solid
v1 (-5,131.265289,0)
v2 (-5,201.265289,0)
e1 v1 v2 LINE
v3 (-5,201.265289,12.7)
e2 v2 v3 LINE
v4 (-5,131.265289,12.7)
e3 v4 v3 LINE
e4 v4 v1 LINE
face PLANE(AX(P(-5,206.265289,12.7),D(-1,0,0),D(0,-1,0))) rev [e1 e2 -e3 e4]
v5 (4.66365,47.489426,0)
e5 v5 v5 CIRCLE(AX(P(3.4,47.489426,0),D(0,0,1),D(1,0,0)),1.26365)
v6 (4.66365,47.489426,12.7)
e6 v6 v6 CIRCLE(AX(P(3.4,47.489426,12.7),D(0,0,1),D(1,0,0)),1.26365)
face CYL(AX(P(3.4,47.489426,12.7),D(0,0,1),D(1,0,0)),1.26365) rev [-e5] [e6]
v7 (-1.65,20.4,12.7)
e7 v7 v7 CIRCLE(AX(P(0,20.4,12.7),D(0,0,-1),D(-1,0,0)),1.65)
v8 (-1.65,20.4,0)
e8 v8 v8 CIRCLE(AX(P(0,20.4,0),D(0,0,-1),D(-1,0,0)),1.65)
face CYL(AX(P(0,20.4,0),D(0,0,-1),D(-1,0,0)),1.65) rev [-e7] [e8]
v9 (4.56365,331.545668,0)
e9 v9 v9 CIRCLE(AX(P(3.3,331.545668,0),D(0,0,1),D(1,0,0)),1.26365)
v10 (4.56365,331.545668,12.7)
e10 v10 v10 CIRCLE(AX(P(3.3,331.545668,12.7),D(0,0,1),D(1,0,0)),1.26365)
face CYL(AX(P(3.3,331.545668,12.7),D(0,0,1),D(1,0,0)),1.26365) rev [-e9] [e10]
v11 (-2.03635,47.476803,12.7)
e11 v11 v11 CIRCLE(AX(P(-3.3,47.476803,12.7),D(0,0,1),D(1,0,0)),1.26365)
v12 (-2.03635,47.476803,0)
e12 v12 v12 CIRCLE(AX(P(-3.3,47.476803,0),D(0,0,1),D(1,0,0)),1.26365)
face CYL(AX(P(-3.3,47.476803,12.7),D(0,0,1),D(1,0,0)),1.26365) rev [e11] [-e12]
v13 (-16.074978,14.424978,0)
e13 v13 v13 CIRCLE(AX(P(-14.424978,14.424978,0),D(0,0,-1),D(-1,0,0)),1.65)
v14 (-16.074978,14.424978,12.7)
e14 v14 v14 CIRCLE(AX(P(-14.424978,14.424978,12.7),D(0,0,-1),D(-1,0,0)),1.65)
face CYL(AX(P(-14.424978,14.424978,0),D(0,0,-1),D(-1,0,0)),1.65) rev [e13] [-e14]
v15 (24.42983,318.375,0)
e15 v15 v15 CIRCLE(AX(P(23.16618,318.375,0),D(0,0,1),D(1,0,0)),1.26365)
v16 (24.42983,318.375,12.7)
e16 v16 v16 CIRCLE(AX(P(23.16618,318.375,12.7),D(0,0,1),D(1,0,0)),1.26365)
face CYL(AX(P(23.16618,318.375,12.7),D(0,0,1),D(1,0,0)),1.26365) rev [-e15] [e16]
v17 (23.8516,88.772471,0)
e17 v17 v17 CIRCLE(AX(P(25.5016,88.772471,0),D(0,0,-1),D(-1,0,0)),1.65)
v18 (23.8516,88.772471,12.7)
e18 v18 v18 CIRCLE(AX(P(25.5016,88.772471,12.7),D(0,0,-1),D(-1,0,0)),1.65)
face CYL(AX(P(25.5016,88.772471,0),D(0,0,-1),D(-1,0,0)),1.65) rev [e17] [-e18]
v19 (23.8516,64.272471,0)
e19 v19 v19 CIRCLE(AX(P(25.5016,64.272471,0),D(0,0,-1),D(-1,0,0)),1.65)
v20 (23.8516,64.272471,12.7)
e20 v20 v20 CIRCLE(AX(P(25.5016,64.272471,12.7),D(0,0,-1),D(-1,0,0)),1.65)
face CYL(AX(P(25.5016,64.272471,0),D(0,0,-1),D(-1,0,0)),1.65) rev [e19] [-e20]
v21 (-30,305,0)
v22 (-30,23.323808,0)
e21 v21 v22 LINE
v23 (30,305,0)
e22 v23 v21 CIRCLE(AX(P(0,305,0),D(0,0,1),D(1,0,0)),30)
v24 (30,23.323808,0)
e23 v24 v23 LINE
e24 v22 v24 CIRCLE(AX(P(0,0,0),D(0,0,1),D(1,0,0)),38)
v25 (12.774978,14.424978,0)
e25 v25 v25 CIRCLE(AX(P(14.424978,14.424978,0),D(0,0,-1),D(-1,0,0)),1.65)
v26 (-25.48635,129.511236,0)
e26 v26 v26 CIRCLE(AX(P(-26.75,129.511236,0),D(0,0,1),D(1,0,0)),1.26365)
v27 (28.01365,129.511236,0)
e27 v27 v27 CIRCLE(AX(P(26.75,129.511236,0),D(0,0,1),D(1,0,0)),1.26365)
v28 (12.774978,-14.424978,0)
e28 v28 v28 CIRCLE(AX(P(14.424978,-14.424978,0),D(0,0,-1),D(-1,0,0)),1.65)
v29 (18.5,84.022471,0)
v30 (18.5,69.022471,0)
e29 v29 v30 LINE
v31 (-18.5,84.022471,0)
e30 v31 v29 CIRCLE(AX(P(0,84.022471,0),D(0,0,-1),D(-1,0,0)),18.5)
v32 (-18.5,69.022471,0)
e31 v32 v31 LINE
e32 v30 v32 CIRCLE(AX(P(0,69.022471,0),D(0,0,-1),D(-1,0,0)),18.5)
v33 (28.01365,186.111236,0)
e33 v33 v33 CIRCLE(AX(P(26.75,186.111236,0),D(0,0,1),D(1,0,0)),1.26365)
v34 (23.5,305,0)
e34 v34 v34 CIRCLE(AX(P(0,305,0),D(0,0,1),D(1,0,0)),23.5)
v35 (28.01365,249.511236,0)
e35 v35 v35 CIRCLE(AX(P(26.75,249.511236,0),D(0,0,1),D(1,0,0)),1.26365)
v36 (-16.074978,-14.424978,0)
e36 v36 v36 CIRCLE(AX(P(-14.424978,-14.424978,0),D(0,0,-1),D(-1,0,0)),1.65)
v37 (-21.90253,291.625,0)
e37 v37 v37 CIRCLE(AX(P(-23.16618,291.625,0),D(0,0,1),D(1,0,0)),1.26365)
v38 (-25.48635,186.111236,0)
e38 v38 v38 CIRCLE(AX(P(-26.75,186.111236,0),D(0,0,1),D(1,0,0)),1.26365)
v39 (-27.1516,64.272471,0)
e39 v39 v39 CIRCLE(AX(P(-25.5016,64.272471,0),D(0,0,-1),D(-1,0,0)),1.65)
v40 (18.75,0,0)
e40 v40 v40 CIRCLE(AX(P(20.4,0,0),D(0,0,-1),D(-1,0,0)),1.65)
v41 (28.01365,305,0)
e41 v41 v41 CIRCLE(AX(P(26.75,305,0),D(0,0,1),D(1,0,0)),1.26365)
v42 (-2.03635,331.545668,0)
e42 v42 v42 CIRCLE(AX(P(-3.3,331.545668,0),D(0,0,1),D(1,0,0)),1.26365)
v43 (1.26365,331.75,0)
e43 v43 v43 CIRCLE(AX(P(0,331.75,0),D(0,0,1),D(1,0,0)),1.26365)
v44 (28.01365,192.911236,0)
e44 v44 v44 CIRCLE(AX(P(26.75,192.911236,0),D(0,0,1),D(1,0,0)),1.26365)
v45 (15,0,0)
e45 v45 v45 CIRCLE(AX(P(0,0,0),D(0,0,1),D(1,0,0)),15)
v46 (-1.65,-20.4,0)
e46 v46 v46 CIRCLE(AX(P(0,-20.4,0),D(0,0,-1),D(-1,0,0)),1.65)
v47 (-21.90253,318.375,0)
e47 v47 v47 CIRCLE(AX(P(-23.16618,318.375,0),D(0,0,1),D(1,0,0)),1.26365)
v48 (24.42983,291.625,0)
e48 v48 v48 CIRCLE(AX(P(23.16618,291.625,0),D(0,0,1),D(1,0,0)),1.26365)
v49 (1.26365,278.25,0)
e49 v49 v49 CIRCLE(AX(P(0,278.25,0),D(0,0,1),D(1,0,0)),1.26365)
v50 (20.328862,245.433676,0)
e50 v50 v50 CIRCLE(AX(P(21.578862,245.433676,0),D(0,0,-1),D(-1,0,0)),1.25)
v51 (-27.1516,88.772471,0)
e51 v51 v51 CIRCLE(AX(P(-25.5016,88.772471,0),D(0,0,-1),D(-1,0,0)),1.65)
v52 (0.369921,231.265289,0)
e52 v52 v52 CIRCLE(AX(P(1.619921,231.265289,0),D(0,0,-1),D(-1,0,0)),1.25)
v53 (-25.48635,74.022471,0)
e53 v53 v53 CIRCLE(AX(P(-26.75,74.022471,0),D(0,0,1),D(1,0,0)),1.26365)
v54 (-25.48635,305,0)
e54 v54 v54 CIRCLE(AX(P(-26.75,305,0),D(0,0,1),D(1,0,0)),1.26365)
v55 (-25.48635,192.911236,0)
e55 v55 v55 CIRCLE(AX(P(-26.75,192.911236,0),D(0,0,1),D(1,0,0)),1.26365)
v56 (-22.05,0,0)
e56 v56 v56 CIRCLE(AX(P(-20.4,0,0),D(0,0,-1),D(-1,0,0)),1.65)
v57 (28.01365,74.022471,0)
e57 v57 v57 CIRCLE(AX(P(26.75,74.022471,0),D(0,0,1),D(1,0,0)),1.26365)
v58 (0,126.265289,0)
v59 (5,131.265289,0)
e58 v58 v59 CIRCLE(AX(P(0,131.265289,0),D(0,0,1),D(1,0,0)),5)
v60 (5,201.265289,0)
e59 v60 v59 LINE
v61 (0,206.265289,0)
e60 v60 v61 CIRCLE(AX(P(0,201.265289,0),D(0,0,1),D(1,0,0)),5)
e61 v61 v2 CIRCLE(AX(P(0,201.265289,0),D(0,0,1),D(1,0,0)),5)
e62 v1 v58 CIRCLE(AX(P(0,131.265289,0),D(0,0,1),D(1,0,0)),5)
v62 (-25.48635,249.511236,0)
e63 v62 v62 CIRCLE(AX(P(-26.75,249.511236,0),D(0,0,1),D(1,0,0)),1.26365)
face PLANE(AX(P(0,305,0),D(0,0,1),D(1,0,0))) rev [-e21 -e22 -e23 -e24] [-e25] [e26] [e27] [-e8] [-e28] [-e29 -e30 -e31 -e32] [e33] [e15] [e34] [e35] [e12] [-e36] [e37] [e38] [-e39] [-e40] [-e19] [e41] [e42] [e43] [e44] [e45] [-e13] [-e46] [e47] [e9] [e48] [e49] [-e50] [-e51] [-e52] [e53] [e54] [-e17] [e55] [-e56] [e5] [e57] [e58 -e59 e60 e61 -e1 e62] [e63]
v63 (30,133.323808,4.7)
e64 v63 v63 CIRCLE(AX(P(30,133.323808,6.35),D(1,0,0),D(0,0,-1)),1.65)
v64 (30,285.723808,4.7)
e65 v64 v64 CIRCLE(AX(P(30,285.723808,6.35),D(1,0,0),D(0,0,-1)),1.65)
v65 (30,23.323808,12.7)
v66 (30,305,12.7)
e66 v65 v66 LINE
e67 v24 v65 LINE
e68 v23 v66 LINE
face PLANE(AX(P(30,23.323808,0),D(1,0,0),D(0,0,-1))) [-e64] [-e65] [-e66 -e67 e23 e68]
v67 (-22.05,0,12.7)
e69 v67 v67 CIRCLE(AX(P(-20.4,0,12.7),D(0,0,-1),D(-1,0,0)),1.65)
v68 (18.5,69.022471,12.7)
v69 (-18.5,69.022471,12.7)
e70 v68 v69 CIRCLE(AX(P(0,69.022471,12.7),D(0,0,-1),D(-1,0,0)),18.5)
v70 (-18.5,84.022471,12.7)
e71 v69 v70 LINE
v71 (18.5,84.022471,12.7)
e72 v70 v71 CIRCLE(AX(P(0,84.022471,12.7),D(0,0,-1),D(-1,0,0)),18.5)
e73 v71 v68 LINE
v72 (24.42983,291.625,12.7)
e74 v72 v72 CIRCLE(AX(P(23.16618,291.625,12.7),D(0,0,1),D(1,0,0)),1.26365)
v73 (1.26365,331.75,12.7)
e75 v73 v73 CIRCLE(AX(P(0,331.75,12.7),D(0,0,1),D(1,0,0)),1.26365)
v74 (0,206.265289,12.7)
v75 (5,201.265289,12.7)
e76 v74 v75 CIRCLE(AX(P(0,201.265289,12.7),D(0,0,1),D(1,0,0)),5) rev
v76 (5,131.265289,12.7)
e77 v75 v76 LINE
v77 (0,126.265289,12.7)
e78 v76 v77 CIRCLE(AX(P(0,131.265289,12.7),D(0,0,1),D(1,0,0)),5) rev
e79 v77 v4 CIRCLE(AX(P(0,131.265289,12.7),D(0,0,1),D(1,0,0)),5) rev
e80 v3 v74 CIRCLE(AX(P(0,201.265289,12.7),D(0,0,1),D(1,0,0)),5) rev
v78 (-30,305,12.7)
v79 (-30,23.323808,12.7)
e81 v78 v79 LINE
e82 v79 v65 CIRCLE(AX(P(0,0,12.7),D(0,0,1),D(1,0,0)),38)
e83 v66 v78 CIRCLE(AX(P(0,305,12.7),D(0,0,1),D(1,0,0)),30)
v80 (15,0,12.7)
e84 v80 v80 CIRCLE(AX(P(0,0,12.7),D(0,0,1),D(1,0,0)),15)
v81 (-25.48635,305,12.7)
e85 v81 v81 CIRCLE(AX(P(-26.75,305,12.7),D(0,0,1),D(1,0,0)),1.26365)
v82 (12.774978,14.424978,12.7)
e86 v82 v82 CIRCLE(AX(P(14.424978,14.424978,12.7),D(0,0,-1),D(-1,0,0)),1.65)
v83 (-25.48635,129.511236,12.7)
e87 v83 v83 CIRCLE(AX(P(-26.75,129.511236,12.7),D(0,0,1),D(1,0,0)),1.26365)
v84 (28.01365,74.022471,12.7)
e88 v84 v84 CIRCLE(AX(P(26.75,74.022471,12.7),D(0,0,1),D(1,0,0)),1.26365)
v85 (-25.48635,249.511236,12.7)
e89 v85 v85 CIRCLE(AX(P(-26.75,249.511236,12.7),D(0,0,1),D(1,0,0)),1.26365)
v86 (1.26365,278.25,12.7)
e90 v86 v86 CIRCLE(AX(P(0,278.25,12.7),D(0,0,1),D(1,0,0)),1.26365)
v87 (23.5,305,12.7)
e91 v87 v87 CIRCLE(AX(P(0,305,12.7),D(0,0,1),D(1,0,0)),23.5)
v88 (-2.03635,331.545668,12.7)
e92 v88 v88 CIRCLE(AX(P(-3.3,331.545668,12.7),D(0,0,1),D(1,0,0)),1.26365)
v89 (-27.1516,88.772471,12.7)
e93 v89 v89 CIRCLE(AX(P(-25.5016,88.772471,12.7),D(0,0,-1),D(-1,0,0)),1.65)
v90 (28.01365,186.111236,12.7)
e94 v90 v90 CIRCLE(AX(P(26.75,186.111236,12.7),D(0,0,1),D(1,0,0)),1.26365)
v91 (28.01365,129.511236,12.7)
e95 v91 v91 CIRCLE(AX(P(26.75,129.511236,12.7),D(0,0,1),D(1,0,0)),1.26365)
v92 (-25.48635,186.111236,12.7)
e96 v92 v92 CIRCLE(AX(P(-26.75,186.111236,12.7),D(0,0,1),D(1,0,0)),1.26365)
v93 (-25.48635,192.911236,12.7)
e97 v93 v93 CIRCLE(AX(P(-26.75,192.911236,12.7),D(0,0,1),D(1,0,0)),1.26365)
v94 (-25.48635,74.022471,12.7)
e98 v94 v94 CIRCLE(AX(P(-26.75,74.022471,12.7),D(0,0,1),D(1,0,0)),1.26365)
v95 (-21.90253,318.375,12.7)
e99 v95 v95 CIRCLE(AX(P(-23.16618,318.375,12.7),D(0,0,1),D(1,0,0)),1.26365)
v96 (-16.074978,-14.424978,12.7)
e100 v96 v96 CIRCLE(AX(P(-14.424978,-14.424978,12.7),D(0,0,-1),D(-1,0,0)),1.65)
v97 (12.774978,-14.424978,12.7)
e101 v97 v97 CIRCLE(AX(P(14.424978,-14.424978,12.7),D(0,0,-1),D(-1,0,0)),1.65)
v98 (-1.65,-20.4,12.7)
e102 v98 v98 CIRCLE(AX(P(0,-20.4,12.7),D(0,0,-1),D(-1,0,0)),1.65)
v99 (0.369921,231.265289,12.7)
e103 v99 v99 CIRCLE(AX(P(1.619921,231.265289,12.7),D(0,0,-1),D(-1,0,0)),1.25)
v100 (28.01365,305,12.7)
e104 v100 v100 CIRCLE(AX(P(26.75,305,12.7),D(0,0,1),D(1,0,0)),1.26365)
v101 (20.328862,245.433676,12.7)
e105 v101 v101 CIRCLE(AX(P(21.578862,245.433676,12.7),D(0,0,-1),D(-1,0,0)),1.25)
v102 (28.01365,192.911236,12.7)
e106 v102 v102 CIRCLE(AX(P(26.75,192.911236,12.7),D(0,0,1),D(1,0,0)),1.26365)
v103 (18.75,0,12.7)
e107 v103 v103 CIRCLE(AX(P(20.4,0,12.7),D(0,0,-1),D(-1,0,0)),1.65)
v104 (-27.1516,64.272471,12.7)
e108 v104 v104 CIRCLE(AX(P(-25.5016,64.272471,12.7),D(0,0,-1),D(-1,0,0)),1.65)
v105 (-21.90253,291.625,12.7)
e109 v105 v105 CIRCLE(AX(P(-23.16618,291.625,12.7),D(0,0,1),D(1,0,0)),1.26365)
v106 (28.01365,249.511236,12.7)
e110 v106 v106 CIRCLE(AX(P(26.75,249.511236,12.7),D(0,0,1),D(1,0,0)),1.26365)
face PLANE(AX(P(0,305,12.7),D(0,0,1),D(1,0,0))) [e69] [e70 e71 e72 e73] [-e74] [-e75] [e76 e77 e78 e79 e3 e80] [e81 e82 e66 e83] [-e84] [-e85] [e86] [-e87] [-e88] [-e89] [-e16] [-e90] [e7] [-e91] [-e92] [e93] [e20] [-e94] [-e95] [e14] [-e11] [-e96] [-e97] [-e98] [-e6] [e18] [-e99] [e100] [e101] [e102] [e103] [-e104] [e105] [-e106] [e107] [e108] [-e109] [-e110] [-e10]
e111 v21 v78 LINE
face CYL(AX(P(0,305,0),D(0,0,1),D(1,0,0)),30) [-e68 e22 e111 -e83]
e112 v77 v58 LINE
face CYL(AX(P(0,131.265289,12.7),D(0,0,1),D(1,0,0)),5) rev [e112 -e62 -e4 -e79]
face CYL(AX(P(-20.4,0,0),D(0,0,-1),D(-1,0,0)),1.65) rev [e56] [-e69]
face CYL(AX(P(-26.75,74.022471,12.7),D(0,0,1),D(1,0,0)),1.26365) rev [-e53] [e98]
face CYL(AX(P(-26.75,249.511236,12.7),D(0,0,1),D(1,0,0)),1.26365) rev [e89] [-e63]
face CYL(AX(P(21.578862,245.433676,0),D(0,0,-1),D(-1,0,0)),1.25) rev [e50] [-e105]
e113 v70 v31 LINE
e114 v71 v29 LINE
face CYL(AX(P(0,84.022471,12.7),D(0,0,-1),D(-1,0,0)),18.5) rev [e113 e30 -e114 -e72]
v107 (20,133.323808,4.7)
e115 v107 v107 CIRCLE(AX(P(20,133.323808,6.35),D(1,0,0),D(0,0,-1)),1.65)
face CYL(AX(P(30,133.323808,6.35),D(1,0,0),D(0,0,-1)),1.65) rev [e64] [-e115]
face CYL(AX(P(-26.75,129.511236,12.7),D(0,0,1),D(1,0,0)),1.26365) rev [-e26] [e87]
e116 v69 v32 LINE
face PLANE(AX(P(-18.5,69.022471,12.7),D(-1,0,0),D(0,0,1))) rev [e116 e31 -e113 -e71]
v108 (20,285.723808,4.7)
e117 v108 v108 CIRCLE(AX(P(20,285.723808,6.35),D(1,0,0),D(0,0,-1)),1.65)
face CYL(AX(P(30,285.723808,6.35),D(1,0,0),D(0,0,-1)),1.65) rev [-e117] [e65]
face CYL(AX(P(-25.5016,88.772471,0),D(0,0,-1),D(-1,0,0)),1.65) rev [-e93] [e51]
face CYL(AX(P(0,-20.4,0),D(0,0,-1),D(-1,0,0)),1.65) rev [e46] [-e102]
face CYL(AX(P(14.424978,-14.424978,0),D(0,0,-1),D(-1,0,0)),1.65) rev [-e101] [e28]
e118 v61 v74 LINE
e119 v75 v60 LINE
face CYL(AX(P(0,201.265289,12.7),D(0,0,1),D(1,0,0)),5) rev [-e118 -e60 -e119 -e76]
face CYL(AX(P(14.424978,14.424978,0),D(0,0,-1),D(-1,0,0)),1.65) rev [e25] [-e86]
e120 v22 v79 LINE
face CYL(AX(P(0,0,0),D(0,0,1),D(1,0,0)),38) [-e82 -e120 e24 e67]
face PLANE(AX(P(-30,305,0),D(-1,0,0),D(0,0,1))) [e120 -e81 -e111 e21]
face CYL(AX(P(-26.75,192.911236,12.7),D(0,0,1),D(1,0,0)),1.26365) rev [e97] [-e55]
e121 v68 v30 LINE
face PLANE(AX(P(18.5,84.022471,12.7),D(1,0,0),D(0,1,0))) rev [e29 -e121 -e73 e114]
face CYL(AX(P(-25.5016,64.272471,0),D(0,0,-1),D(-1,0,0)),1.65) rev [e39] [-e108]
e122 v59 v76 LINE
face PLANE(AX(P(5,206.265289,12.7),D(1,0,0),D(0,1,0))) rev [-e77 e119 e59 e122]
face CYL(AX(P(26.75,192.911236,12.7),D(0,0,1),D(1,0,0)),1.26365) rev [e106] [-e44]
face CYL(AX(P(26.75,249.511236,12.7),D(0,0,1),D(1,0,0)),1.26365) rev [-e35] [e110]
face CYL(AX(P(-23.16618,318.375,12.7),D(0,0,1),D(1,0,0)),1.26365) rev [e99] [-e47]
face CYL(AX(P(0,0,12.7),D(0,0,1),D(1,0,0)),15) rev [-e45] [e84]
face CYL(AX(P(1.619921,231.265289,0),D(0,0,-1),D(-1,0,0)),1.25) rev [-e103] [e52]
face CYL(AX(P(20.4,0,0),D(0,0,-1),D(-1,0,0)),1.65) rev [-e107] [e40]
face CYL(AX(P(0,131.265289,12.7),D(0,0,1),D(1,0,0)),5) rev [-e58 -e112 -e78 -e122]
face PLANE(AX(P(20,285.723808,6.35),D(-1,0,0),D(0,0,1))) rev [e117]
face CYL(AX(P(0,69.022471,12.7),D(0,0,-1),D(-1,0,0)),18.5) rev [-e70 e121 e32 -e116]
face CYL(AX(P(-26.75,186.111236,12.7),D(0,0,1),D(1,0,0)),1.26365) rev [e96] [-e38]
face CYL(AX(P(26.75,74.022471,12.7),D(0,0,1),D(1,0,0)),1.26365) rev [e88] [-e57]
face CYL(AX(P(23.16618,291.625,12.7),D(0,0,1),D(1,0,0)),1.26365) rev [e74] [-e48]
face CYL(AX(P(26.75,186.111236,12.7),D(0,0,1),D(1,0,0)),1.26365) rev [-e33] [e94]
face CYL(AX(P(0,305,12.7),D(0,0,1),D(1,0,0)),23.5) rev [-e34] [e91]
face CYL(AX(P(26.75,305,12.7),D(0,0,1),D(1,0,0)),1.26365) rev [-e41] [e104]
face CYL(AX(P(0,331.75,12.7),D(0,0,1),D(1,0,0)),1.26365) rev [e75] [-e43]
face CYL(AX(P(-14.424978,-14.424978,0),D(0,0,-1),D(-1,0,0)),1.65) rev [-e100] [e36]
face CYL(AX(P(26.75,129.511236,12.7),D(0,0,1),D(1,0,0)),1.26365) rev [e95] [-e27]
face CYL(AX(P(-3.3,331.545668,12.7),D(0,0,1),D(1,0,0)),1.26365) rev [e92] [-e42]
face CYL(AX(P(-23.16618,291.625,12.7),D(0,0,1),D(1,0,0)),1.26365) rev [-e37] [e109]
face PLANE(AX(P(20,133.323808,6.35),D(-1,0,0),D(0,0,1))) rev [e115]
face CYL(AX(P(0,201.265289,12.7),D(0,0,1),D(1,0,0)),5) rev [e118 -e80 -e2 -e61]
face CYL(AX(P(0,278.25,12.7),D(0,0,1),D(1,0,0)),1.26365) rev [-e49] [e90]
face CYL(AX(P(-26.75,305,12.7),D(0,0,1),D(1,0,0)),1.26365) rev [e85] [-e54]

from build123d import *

# Parameters (mm, degrees)
BOSS_EXTRUDE1_DEPTH          = 12.7
CUT_EXTRUDE1_DEPTH           = 338.387447899
HOLE1_D                      = 30
HOLE2_D                      = 47
F_39_0_0995_DIAMETER_HOLE1_D = 2.5273
F_4_CLEARANCE_HOLE1_D        = 3.3
F_2_CLEARANCE_HOLE1_D        = 2.499999999
F_4_CLEARANCE_HOLE2_D        = 3.3
F_4_CLEARANCE_HOLE2_DEPTH    = 10
SKETCH_1_W                   = 10
SKETCH_1_H                   = 80
CUT_EXTRUDE_1_DEPTH          = 338.387447899
FILLET_1_R                   = 5


with BuildPart() as part:
    # Sketch1 → Boss-Extrude1 (new body)
    with BuildSketch(Plane.XY.offset(12.7)):
        with BuildLine():
            Line((-30, 305), (-30, 23.323807579))
            ThreePointArc((-30, 23.323807579), (0, -38), (30, 23.323807579))
            Line((30, 23.323807579), (30, 305))
            ThreePointArc((30, 305), (0, 335), (-30, 305))
        make_face()
    extrude(amount=-BOSS_EXTRUDE1_DEPTH)

    # Sketch2 → Cut-Extrude1 (cut, through all)
    with BuildSketch(Plane(origin=(0, 0, 0), x_dir=(-1, 0, 0), z_dir=(0, 0, -1))):
        with BuildLine():
            Line((18.5, 69.02247107), (18.5, 84.02247107))
            ThreePointArc((18.5, 84.02247107), (0, 102.52247107), (-18.5, 84.02247107))
            Line((-18.5, 84.02247107), (-18.5, 69.02247107))
            ThreePointArc((-18.5, 69.02247107), (0, 50.52247107), (18.5, 69.02247107))
        make_face()
    extrude(amount=-CUT_EXTRUDE1_DEPTH, mode=Mode.SUBTRACT)

    # Hole1 (through all)
    with Locations(Plane.XY.offset(12.7)):
        with Locations((0, 0)):
            Hole(HOLE1_D / 2)

    # Hole2 (through all)
    with Locations(Plane.XY.offset(12.7)):
        with Locations((0, 305)):
            Hole(HOLE2_D / 2)

    # #39 (0.0995) Diameter Hole1 (through all)
    with Locations(Plane.XY.offset(12.7)):
        with Locations((-26.75, 74.022471071), (-26.75, 129.511235535), (-26.75, 186.111235535), (-26.750000001, 192.911235535), (-26.750000001, 249.511235535), (-26.750000001, 305), (-3.300000001, 331.545668196), (3.299999999, 331.545668196), (26.749999999, 305), (26.749999999, 249.511235535), (26.749999999, 192.911235535), (26.75, 186.111235535), (26.75, 129.511235535), (26.75, 74.022471071), (3.4, 47.489425637), (-3.3, 47.476802874), (-23.166179551, 318.375), (-23.166179551, 291.625), (0, 278.25), (23.166179551, 291.625), (23.166179551, 318.375), (0, 331.75)):
            Hole(F_39_0_0995_DIAMETER_HOLE1_D / 2)

    # #4 Clearance Hole1 (through all)
    with Locations(Plane(origin=(0, 0, 0), x_dir=(-1, 0, 0), z_dir=(0, 0, -1))):
        with Locations((-25.5016, 64.272471071), (-25.5016, 88.772471071), (14.424978336, 14.424978336), (20.4, 0), (14.424978336, -14.424978336), (0, -20.4), (-14.424978336, -14.424978336), (-20.4, 0), (-14.424978336, 14.424978336), (0, 20.4), (25.5016, 64.272471071), (25.5016, 88.772471071)):
            Hole(F_4_CLEARANCE_HOLE1_D / 2)

    # #2 Clearance Hole1 (through all)
    with Locations(Plane(origin=(0, 0, 0), x_dir=(-1, 0, 0), z_dir=(0, 0, -1))):
        with Locations((-1.619921459, 231.265288591), (-21.578861519, 245.43367635)):
            Hole(F_2_CLEARANCE_HOLE1_D / 2)

    # #4 Clearance Hole2
    with Locations(Plane(origin=(30, 0, 0), x_dir=(0, 0, -1), z_dir=(1, 0, 0))):
        with Locations((-6.35, 285.723807579), (-6.35, 133.323807579)):
            Hole(F_4_CLEARANCE_HOLE2_D / 2, depth=F_4_CLEARANCE_HOLE2_DEPTH)

    # 草图1 → 切除-拉伸1 (cut, through all)
    with BuildSketch(Plane(origin=(0, 0, 0), x_dir=(-1, 0, 0), z_dir=(0, 0, -1))):
        with Locations((0, 166.265288591)):
            Rectangle(SKETCH_1_W, SKETCH_1_H)
    extrude(amount=-CUT_EXTRUDE_1_DEPTH, mode=Mode.SUBTRACT)

    # 圆角1
    fillet_1_edges = [part.edges().sort_by_distance(p)[0] for p in [
        (-5, 126.265288591, 6.35),
        (5, 126.265288591, 6.35),
        (-5, 206.265288591, 6.35),
        (5, 206.265288591, 6.35),
    ]]
    fillet(fillet_1_edges, radius=FILLET_1_R - 0.0001)  # a hair under: the kernel refuses the full size


solid = part.part
